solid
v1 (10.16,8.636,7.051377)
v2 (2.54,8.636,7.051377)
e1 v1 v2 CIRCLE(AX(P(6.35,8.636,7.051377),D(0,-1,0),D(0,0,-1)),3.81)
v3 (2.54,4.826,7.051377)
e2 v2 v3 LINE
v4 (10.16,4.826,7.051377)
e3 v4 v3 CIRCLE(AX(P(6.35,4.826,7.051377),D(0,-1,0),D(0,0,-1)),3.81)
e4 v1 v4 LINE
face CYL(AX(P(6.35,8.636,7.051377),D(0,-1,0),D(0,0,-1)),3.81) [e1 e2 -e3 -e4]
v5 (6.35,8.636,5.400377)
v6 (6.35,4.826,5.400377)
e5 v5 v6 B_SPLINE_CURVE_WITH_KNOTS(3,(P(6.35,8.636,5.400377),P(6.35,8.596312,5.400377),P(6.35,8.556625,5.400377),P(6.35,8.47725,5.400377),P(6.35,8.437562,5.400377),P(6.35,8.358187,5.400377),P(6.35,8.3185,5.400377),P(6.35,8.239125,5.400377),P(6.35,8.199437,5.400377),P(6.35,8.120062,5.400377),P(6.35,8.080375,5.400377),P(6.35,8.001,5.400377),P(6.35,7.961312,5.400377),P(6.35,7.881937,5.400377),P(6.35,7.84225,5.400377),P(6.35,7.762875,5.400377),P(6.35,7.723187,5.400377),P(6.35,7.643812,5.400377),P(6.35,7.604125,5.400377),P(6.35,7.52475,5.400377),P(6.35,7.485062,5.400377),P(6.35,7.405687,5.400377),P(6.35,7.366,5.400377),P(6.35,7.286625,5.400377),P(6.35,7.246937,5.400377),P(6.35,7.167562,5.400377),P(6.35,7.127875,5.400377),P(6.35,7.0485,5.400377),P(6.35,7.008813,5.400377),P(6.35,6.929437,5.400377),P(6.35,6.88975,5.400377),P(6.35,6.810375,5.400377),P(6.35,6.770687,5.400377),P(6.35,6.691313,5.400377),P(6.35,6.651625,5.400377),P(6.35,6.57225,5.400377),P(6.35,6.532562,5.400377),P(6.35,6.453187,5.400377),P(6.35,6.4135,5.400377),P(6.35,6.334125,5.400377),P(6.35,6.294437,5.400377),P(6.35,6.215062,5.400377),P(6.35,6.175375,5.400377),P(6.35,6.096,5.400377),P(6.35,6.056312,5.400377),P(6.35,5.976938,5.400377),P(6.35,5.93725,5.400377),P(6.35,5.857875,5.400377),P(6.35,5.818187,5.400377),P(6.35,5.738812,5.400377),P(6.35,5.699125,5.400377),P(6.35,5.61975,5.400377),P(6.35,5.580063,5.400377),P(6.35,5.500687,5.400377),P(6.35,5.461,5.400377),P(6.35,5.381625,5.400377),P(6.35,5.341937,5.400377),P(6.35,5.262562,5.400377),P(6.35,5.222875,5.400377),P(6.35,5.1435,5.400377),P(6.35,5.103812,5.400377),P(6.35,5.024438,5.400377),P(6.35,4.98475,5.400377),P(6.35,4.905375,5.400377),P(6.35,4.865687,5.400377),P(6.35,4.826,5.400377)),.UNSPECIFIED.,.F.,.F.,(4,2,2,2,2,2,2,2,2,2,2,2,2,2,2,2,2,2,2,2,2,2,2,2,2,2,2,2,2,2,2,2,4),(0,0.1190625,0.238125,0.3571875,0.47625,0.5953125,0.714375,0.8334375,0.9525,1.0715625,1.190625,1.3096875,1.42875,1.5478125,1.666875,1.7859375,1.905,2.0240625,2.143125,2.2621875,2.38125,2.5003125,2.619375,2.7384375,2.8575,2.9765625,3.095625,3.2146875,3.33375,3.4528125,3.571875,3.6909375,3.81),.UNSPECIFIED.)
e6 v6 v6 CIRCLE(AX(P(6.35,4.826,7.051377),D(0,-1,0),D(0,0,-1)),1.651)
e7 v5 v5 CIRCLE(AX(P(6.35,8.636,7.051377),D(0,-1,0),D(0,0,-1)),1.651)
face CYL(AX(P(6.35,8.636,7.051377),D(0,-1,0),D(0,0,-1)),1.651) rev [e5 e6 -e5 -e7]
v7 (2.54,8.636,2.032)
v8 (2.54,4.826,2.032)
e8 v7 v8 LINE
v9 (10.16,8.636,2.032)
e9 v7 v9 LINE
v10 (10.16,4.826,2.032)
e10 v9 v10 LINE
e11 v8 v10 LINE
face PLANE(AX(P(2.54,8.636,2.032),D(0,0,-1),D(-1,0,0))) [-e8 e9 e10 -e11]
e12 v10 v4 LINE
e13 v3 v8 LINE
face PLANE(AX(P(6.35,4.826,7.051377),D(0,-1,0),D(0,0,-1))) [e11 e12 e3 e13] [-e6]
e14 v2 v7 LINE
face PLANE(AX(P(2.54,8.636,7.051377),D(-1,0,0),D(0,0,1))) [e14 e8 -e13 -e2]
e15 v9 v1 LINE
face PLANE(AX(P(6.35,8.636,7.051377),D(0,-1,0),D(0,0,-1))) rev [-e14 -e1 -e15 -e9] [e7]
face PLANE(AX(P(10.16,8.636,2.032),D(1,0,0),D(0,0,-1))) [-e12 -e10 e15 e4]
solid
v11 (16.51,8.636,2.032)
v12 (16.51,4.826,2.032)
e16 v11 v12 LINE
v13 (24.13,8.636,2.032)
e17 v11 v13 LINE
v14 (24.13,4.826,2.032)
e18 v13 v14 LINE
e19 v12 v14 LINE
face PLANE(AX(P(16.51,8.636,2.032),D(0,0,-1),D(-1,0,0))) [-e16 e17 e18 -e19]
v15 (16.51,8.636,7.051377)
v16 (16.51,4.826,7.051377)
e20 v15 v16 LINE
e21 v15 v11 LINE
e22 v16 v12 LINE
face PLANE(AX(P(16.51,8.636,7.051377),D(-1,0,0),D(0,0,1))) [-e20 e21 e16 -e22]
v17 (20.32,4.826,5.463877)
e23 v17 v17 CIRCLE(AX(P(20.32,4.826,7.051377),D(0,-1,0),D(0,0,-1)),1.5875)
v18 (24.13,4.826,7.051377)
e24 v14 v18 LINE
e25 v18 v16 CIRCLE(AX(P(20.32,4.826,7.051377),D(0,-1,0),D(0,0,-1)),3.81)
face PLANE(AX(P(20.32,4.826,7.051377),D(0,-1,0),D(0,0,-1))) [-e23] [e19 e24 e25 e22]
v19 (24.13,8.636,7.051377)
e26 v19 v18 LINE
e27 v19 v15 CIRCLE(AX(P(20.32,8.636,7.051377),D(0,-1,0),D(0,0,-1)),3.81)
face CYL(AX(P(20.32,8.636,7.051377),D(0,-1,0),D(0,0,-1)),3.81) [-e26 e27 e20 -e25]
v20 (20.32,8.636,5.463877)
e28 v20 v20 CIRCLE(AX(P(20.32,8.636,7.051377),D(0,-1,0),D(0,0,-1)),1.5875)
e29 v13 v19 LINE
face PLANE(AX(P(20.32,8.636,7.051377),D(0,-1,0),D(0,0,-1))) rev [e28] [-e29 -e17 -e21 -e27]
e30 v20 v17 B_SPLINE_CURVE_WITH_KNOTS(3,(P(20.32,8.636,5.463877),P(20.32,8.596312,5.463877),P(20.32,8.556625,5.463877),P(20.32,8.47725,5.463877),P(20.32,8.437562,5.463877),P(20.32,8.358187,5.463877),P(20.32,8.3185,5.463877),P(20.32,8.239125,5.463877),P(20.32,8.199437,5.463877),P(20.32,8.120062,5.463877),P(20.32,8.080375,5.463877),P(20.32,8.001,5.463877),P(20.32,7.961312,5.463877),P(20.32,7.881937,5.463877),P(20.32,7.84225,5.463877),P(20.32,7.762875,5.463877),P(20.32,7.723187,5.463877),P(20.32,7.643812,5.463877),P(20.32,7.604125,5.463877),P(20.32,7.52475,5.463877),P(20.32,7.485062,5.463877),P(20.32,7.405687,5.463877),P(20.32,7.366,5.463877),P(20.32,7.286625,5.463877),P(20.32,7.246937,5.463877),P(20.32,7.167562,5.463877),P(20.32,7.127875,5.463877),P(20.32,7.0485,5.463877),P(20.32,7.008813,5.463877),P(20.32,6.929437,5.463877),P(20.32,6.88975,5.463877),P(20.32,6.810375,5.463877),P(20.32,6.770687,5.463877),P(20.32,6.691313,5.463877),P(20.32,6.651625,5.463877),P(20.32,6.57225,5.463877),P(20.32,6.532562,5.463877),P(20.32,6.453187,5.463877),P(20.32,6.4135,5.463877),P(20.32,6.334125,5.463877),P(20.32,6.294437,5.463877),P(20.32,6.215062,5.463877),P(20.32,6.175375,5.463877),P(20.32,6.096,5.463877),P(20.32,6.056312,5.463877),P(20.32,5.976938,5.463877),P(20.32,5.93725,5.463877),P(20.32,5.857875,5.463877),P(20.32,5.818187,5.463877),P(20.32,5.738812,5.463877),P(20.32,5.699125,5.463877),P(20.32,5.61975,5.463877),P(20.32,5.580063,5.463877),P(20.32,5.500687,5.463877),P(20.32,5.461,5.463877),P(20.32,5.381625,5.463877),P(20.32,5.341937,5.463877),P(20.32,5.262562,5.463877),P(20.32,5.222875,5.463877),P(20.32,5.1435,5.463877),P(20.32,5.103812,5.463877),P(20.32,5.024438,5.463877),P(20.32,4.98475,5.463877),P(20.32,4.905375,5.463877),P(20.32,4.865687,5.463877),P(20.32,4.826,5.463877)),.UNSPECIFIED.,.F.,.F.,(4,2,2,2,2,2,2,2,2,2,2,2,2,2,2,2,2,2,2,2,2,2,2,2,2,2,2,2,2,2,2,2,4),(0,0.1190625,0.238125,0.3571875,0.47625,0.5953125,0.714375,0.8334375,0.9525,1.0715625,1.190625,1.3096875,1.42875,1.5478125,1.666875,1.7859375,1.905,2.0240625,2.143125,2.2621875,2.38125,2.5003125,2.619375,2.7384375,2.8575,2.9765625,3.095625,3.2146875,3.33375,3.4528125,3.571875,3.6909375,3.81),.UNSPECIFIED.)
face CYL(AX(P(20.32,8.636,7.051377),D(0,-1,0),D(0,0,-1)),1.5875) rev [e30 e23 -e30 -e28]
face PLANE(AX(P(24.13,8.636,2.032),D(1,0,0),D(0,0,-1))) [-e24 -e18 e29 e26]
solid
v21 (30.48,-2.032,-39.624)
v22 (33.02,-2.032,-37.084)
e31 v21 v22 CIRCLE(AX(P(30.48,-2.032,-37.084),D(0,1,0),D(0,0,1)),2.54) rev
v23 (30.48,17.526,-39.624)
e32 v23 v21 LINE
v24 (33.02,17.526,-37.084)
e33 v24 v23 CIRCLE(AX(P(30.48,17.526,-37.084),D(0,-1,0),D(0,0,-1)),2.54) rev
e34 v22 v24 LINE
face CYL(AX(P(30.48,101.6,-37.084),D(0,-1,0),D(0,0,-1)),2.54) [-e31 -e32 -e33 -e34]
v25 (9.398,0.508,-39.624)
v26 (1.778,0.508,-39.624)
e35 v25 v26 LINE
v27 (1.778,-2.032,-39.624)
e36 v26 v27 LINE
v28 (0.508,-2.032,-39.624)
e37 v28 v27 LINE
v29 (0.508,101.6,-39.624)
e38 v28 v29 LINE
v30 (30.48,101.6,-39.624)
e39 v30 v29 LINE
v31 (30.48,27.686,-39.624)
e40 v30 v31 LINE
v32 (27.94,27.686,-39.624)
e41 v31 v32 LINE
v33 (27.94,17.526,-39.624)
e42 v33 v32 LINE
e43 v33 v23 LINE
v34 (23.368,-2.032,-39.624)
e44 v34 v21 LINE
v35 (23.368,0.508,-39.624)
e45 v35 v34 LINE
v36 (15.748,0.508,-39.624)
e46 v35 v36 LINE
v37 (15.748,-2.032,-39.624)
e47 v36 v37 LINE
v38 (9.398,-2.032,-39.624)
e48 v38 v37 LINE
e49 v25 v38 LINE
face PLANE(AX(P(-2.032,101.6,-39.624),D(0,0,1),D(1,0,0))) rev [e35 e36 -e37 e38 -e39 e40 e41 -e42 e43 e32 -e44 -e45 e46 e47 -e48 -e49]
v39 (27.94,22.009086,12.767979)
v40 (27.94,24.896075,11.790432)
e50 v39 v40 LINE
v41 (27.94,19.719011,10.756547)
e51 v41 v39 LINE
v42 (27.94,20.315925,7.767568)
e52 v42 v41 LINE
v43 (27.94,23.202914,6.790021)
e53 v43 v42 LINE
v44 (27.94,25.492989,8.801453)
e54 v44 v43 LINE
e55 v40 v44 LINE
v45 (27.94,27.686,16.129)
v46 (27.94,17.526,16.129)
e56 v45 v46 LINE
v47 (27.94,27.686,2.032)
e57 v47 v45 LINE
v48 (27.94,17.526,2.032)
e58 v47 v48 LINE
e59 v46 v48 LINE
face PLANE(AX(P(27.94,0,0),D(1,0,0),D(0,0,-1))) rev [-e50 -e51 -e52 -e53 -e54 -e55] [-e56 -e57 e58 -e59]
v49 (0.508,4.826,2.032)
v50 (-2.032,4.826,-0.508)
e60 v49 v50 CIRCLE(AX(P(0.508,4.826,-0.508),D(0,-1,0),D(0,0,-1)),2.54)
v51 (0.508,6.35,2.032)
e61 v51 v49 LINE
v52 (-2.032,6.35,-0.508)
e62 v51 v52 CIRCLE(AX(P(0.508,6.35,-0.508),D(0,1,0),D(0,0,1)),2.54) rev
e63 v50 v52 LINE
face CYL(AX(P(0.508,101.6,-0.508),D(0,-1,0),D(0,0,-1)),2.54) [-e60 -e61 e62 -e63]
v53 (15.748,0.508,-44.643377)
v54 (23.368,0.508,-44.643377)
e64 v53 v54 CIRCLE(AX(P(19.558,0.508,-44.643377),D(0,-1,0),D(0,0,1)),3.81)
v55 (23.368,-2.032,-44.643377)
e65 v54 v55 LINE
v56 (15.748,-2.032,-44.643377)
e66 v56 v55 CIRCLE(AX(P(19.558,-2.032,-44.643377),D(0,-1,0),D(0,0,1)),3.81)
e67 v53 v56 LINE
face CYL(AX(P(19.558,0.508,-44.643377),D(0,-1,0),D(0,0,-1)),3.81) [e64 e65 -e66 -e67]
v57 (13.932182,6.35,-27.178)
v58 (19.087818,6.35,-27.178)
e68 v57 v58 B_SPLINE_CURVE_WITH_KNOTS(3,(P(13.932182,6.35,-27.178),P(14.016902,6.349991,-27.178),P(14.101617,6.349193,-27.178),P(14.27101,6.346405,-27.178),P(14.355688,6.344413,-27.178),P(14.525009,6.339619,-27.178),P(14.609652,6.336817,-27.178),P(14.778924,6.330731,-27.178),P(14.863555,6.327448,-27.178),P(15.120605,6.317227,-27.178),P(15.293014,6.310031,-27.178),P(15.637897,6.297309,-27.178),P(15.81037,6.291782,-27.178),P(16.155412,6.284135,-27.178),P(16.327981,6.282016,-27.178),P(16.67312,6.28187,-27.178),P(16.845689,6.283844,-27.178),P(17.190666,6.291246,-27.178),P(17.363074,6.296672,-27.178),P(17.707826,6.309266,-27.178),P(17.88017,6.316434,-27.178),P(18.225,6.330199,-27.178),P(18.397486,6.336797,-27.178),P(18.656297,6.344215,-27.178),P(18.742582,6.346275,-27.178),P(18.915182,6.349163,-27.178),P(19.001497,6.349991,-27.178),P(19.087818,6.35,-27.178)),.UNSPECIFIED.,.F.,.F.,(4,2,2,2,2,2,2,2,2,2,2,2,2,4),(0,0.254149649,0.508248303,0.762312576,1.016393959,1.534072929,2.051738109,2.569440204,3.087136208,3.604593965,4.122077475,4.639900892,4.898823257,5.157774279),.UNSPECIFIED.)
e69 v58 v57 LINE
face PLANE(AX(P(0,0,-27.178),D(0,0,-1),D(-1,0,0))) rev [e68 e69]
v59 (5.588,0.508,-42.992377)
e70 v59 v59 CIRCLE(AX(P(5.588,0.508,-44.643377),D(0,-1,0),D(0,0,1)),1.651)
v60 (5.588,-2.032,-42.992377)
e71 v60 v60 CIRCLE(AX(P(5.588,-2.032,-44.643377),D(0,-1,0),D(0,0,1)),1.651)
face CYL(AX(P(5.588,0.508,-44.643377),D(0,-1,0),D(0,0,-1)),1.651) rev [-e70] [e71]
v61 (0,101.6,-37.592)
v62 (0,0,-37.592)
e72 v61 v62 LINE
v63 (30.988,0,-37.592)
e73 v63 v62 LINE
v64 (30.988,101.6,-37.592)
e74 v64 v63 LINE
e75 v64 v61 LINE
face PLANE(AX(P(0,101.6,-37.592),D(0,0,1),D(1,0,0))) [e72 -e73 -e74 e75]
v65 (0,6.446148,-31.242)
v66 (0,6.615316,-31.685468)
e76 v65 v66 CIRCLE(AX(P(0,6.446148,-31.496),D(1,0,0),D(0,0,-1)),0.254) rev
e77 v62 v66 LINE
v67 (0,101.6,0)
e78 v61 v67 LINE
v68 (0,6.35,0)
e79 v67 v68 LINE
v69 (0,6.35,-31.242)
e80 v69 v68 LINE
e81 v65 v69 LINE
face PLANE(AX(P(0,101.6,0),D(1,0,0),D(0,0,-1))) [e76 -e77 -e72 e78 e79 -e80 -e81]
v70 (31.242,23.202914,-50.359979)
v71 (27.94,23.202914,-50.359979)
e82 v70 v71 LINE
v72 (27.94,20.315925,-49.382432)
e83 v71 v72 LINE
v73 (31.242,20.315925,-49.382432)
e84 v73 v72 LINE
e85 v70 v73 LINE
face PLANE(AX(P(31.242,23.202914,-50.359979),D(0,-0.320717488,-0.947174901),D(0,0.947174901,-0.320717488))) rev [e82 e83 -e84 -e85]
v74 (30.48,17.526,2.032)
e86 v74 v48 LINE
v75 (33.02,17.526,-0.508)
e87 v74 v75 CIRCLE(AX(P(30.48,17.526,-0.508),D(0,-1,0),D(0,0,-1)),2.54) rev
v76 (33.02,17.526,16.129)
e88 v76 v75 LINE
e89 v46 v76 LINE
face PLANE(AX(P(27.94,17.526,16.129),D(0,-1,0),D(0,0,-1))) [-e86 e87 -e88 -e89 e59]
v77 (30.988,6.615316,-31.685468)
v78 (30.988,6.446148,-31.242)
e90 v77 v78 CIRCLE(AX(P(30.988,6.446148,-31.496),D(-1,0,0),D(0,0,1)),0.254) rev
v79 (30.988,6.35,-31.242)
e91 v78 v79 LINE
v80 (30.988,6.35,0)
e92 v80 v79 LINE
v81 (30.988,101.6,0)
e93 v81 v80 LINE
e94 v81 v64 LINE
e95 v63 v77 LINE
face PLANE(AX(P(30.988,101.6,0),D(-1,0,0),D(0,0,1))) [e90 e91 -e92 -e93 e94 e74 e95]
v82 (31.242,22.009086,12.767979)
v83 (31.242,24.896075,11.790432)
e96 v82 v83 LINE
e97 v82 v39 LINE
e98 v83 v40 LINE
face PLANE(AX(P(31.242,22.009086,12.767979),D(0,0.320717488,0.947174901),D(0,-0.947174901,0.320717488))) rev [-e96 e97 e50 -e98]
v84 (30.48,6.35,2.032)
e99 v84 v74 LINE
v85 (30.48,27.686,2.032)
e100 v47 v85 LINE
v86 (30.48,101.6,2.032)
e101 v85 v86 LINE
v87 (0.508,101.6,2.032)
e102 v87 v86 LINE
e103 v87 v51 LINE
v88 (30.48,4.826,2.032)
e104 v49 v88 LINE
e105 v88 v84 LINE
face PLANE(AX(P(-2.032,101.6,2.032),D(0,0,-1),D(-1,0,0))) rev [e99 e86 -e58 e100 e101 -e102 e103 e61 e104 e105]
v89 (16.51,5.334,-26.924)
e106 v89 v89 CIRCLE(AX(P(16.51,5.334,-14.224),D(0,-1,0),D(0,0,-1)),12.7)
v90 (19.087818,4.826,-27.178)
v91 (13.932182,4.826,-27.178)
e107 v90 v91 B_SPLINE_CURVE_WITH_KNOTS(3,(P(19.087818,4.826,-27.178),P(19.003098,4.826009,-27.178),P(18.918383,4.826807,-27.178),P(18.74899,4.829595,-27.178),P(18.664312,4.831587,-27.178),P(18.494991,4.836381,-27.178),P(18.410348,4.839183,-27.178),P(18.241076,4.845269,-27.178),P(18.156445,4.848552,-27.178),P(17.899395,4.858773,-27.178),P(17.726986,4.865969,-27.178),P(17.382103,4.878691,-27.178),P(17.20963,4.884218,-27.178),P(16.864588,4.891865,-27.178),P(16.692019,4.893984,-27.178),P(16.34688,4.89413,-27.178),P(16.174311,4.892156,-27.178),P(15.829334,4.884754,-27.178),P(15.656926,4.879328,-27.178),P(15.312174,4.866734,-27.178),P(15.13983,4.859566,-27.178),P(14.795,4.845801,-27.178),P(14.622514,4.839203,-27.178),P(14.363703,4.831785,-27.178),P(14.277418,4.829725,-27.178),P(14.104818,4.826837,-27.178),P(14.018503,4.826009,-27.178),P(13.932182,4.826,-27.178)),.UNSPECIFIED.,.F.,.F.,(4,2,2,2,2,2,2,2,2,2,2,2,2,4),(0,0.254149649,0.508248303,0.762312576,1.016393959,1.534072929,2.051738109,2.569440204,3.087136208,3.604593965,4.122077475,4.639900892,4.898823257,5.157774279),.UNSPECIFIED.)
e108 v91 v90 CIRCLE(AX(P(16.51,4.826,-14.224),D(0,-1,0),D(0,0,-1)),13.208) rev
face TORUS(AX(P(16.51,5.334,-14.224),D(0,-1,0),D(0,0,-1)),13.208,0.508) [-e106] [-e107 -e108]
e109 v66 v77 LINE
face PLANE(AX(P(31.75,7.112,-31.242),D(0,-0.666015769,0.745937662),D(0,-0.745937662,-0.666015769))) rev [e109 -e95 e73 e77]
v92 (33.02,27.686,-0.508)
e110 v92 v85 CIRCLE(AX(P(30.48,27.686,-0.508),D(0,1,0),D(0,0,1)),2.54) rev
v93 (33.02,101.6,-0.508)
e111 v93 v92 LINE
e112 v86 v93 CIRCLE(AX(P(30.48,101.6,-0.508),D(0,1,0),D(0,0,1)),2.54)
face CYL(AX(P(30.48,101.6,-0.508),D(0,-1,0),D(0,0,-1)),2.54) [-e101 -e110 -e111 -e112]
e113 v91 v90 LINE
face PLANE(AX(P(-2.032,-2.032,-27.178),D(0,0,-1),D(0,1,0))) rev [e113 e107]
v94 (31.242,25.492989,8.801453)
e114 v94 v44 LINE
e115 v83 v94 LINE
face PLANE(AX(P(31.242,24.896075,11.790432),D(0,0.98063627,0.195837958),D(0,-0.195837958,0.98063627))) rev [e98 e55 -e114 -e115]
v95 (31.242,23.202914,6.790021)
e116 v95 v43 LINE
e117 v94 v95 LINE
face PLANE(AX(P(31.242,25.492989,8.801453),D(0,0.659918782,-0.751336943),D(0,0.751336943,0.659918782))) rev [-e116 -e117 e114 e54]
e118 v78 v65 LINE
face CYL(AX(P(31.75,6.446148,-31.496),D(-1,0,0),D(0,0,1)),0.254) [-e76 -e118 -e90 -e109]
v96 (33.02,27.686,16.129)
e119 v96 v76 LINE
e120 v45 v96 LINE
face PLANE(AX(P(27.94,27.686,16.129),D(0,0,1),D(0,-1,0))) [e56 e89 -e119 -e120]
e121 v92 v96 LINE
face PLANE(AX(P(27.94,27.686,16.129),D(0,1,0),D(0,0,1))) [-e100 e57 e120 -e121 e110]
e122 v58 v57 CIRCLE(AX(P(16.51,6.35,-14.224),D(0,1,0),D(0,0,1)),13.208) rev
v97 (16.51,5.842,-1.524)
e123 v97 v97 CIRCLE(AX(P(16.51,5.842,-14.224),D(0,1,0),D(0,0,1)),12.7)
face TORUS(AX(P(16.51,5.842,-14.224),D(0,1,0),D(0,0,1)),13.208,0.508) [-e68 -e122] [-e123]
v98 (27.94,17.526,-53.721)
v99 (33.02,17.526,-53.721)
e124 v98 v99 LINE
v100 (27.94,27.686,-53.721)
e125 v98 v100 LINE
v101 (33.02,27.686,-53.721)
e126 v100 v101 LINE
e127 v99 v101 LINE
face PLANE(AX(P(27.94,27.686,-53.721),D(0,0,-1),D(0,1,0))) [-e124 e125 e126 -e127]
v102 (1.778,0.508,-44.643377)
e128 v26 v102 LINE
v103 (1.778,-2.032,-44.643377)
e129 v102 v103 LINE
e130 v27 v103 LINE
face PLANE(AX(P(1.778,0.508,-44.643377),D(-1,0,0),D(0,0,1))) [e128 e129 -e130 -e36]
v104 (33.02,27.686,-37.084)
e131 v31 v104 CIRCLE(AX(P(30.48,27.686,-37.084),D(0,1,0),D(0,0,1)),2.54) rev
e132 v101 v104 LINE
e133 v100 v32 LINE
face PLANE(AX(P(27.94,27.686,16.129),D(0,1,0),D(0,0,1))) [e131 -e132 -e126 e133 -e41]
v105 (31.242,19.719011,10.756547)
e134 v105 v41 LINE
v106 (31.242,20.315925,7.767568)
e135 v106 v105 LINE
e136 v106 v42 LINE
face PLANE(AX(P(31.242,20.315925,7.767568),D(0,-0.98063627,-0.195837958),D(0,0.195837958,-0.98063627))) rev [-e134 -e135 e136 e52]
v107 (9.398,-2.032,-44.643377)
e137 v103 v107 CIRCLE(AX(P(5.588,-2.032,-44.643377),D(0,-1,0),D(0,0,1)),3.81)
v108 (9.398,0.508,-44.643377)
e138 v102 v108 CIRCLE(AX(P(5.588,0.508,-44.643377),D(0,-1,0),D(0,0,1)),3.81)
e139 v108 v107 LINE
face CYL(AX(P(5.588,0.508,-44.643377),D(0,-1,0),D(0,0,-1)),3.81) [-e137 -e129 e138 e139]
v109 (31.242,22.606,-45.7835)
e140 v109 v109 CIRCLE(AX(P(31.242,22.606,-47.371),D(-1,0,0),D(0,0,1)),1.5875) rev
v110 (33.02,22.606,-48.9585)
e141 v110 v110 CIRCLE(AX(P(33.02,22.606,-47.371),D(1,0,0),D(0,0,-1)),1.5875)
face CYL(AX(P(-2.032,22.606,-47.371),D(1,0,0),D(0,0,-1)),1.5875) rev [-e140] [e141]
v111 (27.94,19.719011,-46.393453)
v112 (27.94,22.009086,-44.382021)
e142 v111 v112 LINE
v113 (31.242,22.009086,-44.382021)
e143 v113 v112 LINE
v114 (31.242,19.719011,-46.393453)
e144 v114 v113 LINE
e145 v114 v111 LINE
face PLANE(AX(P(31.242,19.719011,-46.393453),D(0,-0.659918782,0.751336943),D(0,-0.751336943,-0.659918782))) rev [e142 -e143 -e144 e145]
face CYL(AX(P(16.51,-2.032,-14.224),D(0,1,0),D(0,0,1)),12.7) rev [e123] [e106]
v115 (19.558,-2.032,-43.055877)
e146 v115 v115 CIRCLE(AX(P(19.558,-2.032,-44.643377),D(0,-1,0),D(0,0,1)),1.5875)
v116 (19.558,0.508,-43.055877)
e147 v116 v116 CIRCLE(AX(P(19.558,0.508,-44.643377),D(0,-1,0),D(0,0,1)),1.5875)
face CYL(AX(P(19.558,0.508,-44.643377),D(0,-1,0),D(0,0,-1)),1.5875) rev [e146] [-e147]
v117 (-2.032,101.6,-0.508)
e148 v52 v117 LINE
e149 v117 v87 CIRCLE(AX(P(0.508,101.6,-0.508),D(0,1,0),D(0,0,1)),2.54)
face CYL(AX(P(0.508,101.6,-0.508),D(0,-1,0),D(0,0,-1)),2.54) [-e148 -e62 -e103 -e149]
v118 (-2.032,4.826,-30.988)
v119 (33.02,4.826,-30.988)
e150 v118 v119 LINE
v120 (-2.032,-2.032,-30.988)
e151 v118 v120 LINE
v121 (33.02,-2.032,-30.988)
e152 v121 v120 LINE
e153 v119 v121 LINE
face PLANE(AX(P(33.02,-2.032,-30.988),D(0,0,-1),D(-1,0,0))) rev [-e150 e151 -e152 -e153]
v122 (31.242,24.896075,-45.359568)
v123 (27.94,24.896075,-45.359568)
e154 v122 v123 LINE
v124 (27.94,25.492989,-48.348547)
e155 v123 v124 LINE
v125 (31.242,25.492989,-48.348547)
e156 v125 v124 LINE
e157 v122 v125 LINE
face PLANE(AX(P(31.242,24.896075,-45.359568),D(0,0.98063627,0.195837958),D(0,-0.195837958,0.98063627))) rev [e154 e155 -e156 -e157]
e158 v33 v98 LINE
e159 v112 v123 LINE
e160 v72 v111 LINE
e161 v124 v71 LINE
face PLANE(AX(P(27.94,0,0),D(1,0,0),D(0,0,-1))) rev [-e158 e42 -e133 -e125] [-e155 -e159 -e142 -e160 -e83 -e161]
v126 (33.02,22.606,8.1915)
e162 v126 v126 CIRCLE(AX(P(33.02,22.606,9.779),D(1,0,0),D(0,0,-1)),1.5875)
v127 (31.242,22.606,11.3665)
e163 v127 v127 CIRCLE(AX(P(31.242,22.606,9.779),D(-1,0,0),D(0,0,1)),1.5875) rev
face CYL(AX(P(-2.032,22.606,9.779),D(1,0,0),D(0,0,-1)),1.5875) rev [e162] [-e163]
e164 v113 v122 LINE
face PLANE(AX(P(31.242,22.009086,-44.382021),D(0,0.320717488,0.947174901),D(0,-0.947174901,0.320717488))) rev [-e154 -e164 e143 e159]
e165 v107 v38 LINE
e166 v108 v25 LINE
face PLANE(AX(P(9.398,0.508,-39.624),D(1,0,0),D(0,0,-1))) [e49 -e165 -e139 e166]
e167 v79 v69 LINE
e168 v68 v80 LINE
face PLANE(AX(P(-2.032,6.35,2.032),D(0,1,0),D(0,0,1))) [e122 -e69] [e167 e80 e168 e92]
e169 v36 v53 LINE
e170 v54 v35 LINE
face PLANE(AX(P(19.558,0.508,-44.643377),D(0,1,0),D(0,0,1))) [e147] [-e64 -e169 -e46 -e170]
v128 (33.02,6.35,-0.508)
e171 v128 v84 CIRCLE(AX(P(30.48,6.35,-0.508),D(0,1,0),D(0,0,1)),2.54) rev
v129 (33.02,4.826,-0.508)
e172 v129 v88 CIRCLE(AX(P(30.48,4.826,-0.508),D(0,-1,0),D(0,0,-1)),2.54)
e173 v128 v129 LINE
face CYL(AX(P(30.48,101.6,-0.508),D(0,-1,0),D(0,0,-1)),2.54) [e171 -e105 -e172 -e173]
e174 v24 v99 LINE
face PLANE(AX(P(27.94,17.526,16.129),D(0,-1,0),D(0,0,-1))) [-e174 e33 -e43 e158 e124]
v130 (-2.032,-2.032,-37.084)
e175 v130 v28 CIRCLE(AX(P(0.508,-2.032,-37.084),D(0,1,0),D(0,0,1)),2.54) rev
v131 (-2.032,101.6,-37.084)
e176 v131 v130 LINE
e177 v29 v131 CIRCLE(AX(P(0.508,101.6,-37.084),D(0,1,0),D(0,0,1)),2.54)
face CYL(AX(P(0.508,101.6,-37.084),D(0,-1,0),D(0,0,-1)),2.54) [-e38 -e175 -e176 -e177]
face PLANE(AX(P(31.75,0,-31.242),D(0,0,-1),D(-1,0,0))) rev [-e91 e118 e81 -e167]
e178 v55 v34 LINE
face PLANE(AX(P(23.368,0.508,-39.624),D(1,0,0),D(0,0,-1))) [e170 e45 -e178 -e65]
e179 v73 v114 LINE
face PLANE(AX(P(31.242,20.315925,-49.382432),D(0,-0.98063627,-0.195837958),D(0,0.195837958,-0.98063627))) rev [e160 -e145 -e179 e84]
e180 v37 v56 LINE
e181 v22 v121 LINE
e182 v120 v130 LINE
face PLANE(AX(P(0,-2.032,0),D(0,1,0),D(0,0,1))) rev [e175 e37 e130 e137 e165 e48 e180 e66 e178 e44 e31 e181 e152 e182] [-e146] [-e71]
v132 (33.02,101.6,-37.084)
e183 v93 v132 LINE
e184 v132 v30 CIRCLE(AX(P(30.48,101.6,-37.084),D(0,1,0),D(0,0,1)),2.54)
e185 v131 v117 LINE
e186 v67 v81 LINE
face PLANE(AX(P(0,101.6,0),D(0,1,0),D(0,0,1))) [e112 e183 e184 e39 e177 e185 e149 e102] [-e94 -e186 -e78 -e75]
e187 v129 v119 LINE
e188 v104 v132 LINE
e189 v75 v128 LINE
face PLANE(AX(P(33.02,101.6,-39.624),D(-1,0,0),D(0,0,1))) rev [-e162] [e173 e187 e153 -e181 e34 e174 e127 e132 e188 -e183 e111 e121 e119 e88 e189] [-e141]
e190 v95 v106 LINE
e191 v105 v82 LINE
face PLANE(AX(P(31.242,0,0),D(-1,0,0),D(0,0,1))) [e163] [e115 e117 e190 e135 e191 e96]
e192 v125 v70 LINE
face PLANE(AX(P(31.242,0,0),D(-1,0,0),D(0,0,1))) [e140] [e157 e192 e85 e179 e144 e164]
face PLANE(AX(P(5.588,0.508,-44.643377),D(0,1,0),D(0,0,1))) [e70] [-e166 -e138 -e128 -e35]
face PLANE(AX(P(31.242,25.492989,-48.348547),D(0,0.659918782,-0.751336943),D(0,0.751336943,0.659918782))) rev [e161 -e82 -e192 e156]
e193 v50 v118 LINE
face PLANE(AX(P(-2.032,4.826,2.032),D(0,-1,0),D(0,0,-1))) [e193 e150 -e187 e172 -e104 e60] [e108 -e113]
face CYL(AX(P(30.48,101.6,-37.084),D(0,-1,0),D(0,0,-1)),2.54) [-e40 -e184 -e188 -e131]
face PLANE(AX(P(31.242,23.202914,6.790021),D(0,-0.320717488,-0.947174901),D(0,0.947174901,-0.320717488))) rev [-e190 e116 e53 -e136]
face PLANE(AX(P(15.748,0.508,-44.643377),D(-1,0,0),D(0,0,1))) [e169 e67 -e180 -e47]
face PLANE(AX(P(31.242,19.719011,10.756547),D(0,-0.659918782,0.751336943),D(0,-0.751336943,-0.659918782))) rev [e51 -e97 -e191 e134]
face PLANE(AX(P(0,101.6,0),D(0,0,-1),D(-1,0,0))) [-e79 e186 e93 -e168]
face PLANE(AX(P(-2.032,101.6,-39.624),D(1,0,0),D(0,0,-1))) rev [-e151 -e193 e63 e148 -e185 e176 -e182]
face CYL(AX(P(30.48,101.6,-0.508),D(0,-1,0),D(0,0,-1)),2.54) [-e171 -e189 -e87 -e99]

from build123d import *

# Parameters (mm, degrees)
SKETCH2_W               = 35.052
SKETCH2_H               = 41.656
SKETCH2_W_2             = 30.988
SKETCH2_H_2             = 37.592
BOSS_EXTRUDE2_DEPTH     = 101.6
SKETCH3_W               = 35.052
SKETCH3_H               = 41.656
BOSS_EXTRUDE3_DEPTH     = 2.032
CUT_EXTRUDE1_DEPTH      = 29.21
CUT_EXTRUDE1_DEPTH_BACK = 114.942712694
SKETCH4_R               = 12.7
BOSS_EXTRUDE4_DEPTH     = 31.75
FILLET1_R               = 0.254
FILLET2_R               = 2.54
FILLET3_R               = 0.508
SKETCH7_W               = 29.21
SKETCH7_H               = 8.382
CUT_EXTRUDE2_DEPTH      = 115.548086322
SKETCH8_W               = 29.21
SKETCH8_H               = 1.524
BOSS_EXTRUDE5_DEPTH     = 35.052
FILLET6_R               = 2.54
SKETCH9_R               = 12.7
CUT_EXTRUDE3_DEPTH      = 109.318716216
FILLET7_R               = 0.508
BOSS_EXTRUDE6_DEPTH     = 4.064
SKETCH12_W              = 3.81
SKETCH12_H              = 4.318
CUT_EXTRUDE4_DEPTH      = 115.548086352
SKETCH14_W              = 69.85
SKETCH14_H              = 10.16
BOSS_EXTRUDE7_DEPTH     = 5.08
SKETCH16_W              = 30.988
SKETCH16_H              = 37.592
CUT_EXTRUDE5_DEPTH      = 93.98
SKETCH17_R              = 1.5875
CUT_EXTRUDE6_DEPTH      = 121.154685934
CUT_EXTRUDE7_DEPTH      = 3.302
SKETCH19_R              = 1.5875
BOSS_EXTRUDE10_DEPTH    = 3.81
SKETCH19_R_2            = 1.651
BOSS_EXTRUDE10_2_DEPTH  = 3.81
SKETCH20_R              = 1.651
SKETCH20_R_2            = 1.5875
BOSS_EXTRUDE11_DEPTH    = 2.54
SKETCH21_W              = 3.81
SKETCH21_H              = 2.54
CUT_EXTRUDE8_DEPTH      = 121.154685934


with BuildPart() as part:
    # Sketch2 → Boss-Extrude2 (new body)
    with BuildSketch(Plane(origin=(0, 0, 0), x_dir=(1, 0, 0), z_dir=(0, 1, 0))):
        with Locations((15.494, 18.796)):
            Rectangle(SKETCH2_W, SKETCH2_H)
        with Locations((15.494, 18.796)):
            Rectangle(SKETCH2_W_2, SKETCH2_H_2, mode=Mode.SUBTRACT)
    extrude(amount=BOSS_EXTRUDE2_DEPTH)

    # Sketch3 → Boss-Extrude3 (add)
    with BuildSketch(Plane.XZ):
        with Locations((15.494, -18.796)):
            Rectangle(SKETCH3_W, SKETCH3_H)
    extrude(amount=BOSS_EXTRUDE3_DEPTH)

    # Sketch4 → Cut-Extrude1 (cut, two sides: drawn at the far end of the back side and taken through both)
    with BuildSketch(Plane(origin=(0, 0, 0), x_dir=(1, 0, 0), z_dir=(0, 1, 0)).offset(-CUT_EXTRUDE1_DEPTH_BACK)):
        with Locations(Location((16.51, 14.224, 0), (0, 0, 90))):
            Circle(SKETCH4_R)
    extrude(amount=CUT_EXTRUDE1_DEPTH + CUT_EXTRUDE1_DEPTH_BACK, mode=Mode.SUBTRACT)

    # Sketch6 → Boss-Extrude4 (add)
    with BuildSketch(Plane(origin=(0, 0, 0), x_dir=(0, 0, -1), z_dir=(1, 0, 0))):
        Polygon((37.592, 0), (31.242, 0), (31.242, 7.112), align=None)
    extrude(amount=BOSS_EXTRUDE4_DEPTH)

    # Fillet1
    fillet1_edges = [part.edges().sort_by_distance(p)[0] for p in [
        (15.494, 7.112, -31.242),
    ]]
    fillet(fillet1_edges, radius=FILLET1_R)

    # Fillet2
    fillet2_edges = [part.edges().sort_by_distance(p)[0] for p in [
        (-2.032, 49.784, -39.624),
        (33.02, 49.784, -39.624),
        (33.02, 49.784, 2.032),
        (-2.032, 49.784, 2.032),
    ]]
    fillet(fillet2_edges, radius=FILLET2_R)

    # Fillet3
    fillet3_edges = [part.edges().sort_by_distance(p)[0] for p in [
        (16.51, 0, -1.524),
        (16.51, -2.032, -1.524),
    ]]
    fillet(fillet3_edges, radius=FILLET3_R)

    # Sketch7 → Cut-Extrude2 (cut, through all)
    with BuildSketch(Plane(origin=(33.02, 0, 0), x_dir=(0, 0, -1), z_dir=(1, 0, 0))):
        with Locations((12.573, 2.159)):
            Rectangle(SKETCH7_W, SKETCH7_H)
    extrude(amount=-CUT_EXTRUDE2_DEPTH, mode=Mode.SUBTRACT)

    # Sketch8 → Boss-Extrude5 (add, through all)
    with BuildSketch(Plane(origin=(33.02, 0, 0), x_dir=(0, 0, -1), z_dir=(1, 0, 0))):
        with Locations((12.573, 5.588)):
            Rectangle(SKETCH8_W, SKETCH8_H)
    extrude(amount=-BOSS_EXTRUDE5_DEPTH)

    # Fillet6
    fillet6_edges = [part.edges().sort_by_distance(p)[0] for p in [
        (-2.032, 5.588, 2.032),
        (33.02, 5.588, 2.032),
    ]]
    fillet(fillet6_edges, radius=FILLET6_R)

    # Sketch9 → Cut-Extrude3 (cut, through all)
    with BuildSketch(Plane(origin=(0, 6.35, 0), x_dir=(1, 0, 0), z_dir=(0, 1, 0))):
        with Locations(Location((16.51, 14.224, 0), (0, 0, 270))):
            Circle(SKETCH9_R)
    extrude(amount=-CUT_EXTRUDE3_DEPTH, mode=Mode.SUBTRACT)

    # Fillet7
    # the kernel refuses this fillet: 0.508 mm, written as the material it takes off along each edge
    with BuildSketch(Plane(origin=(16.51, 4.826, -14.224), x_dir=(0, 0, 1), z_dir=(-1, 0, 0))) as fillet7_piece_1:
        with BuildLine():
            CenterArc((12.7 + FILLET7_R, FILLET7_R), FILLET7_R, 180, 90)
            Line((12.7, FILLET7_R), (12.7, 0))
            Line((12.7, 0), (12.7 + FILLET7_R, 0))
        make_face()
    revolve(axis=Axis((16.51, 4.826, -14.224), (0, 1, 0)), mode=Mode.SUBTRACT)
    with BuildSketch(Plane(origin=(16.51, 6.35, -14.224), x_dir=(0, 0, 1), z_dir=(-1, 0, 0))) as fillet7_piece_2:
        with BuildLine():
            CenterArc((12.7 + FILLET7_R, -FILLET7_R), FILLET7_R, 90, 90)
            Line((12.7 + FILLET7_R, 0), (12.7, 0))
            Line((12.7, 0), (12.7, -FILLET7_R))
        make_face()
    revolve(axis=Axis((16.51, 6.35, -14.224), (0, 1, 0)), mode=Mode.SUBTRACT)

    # Sketch11 → Boss-Extrude6 (add)
    with BuildSketch(Plane.XY.offset(-31.242)):
        Polygon((-2.032, -2.032), (30.226, -2.032), (33.02, -2.032), (33.02, 6.35), (-2.032, 6.35), align=None)
    extrude(amount=BOSS_EXTRUDE6_DEPTH)

    # Sketch12 → Cut-Extrude4 (cut, through all)
    with BuildSketch(Plane.ZY.offset(2.032)):
        with Locations((-29.083, 0.127)):
            Rectangle(SKETCH12_W, SKETCH12_H)
    extrude(amount=-CUT_EXTRUDE4_DEPTH, mode=Mode.SUBTRACT)

    # Sketch14 → Boss-Extrude7 (add)
    with BuildSketch(Plane(origin=(33.02, 0, 0), x_dir=(0, 0, -1), z_dir=(1, 0, 0))):
        with Locations((18.796, 22.606)):
            Rectangle(SKETCH14_W, SKETCH14_H)
    extrude(amount=-BOSS_EXTRUDE7_DEPTH)

    # Sketch16 → Cut-Extrude5 (cut)
    with BuildSketch(Plane(origin=(0, 101.6, 0), x_dir=(1, 0, 0), z_dir=(0, 1, 0))):
        with Locations((15.494, 18.796)):
            Rectangle(SKETCH16_W, SKETCH16_H)
    extrude(amount=-CUT_EXTRUDE5_DEPTH, mode=Mode.SUBTRACT)

    # Sketch17 → Cut-Extrude6 (cut, through all)
    with BuildSketch(Plane(origin=(33.02, 0, 0), x_dir=(0, 0, -1), z_dir=(1, 0, 0))):
        with Locations((-9.779, 22.606)):
            Circle(SKETCH17_R)
        with Locations((47.371, 22.606)):
            Circle(SKETCH17_R)
    extrude(amount=-CUT_EXTRUDE6_DEPTH, mode=Mode.SUBTRACT)

    # Sketch18 → Cut-Extrude7 (cut)
    with BuildSketch(Plane.ZY.offset(-27.94)):
        Polygon((-46.393453096, 19.719010902), (-44.382020649, 22.009085903), (-45.359567553, 24.896075001), (-48.348546904, 25.492989098), (-50.359979351, 23.202914097), (-49.382432447, 20.315924999), align=None)
        Polygon((10.756546904, 19.719010902), (12.767979351, 22.009085903), (11.790432447, 24.896075001), (8.801453096, 25.492989098), (6.790020649, 23.202914097), (7.767567553, 20.315924999), align=None)
    extrude(amount=-CUT_EXTRUDE7_DEPTH, mode=Mode.SUBTRACT)

    # Sketch20 → Boss-Extrude11 (add)
    # profile 1 of 2: a face of its own
    with BuildSketch(Plane.XZ.offset(2.032)):
        with BuildLine():
            Line((1.778, -39.624), (9.398, -39.624))
            Line((9.398, -39.624), (9.398, -44.64337725))
            ThreePointArc((9.398, -44.64337725), (5.588, -48.45337725), (1.778, -44.64337725))
            Line((1.778, -44.64337725), (1.778, -39.624))
        make_face()
        with Locations(Location((5.588, -44.64337725, 0), (0, 0, 90))):
            Circle(SKETCH20_R, mode=Mode.SUBTRACT)
    # profile 2 of 2: a face of its own
    with BuildSketch(Plane.XZ.offset(2.032)):
        with BuildLine():
            Line((15.748, -39.624), (23.368, -39.624))
            Line((23.368, -39.624), (23.368, -44.64337725))
            ThreePointArc((23.368, -44.64337725), (19.558, -48.45337725), (15.748, -44.64337725))
            Line((15.748, -44.64337725), (15.748, -39.624))
        make_face()
        with Locations(Location((19.558, -44.64337725, 0), (0, 0, 90))):
            Circle(SKETCH20_R_2, mode=Mode.SUBTRACT)
    extrude(amount=-BOSS_EXTRUDE11_DEPTH)

    # Sketch21 → Cut-Extrude8 (cut, through all)
    with BuildSketch(Plane(origin=(33.02, 0, 0), x_dir=(0, 0, -1), z_dir=(1, 0, 0))):
        with Locations((29.083, 3.556)):
            Rectangle(SKETCH21_W, SKETCH21_H)
    extrude(amount=-CUT_EXTRUDE8_DEPTH, mode=Mode.SUBTRACT)


with BuildPart() as body_2:
    # Sketch19 → Boss-Extrude10 (new body)
    with BuildSketch(Plane.XZ.offset(-4.826)):
        with BuildLine():
            Line((24.13, 2.032), (24.13, 7.05137725))
            ThreePointArc((24.13, 7.05137725), (20.32, 10.86137725), (16.51, 7.05137725))
            Line((16.51, 7.05137725), (16.51, 2.032))
            Line((16.51, 2.032), (24.13, 2.032))
        make_face()
        with Locations(Location((20.32, 7.05137725, 0), (0, 0, 270))):
            Circle(SKETCH19_R, mode=Mode.SUBTRACT)
    extrude(amount=-BOSS_EXTRUDE10_DEPTH)


with BuildPart() as body_3:
    # Sketch19 → Boss-Extrude10 2 (new body)
    with BuildSketch(Plane.XZ.offset(-4.826)):
        with BuildLine():
            Line((10.16, 2.032), (10.16, 7.05137725))
            ThreePointArc((10.16, 7.05137725), (6.35, 10.86137725), (2.54, 7.05137725))
            Line((2.54, 7.05137725), (2.54, 2.032))
            Line((2.54, 2.032), (10.16, 2.032))
        make_face()
        with Locations(Location((6.35, 7.05137725, 0), (0, 0, 270))):
            Circle(SKETCH19_R_2, mode=Mode.SUBTRACT)
    extrude(amount=-BOSS_EXTRUDE10_2_DEPTH)


solid = Compound([part.part, body_2.part, body_3.part])
